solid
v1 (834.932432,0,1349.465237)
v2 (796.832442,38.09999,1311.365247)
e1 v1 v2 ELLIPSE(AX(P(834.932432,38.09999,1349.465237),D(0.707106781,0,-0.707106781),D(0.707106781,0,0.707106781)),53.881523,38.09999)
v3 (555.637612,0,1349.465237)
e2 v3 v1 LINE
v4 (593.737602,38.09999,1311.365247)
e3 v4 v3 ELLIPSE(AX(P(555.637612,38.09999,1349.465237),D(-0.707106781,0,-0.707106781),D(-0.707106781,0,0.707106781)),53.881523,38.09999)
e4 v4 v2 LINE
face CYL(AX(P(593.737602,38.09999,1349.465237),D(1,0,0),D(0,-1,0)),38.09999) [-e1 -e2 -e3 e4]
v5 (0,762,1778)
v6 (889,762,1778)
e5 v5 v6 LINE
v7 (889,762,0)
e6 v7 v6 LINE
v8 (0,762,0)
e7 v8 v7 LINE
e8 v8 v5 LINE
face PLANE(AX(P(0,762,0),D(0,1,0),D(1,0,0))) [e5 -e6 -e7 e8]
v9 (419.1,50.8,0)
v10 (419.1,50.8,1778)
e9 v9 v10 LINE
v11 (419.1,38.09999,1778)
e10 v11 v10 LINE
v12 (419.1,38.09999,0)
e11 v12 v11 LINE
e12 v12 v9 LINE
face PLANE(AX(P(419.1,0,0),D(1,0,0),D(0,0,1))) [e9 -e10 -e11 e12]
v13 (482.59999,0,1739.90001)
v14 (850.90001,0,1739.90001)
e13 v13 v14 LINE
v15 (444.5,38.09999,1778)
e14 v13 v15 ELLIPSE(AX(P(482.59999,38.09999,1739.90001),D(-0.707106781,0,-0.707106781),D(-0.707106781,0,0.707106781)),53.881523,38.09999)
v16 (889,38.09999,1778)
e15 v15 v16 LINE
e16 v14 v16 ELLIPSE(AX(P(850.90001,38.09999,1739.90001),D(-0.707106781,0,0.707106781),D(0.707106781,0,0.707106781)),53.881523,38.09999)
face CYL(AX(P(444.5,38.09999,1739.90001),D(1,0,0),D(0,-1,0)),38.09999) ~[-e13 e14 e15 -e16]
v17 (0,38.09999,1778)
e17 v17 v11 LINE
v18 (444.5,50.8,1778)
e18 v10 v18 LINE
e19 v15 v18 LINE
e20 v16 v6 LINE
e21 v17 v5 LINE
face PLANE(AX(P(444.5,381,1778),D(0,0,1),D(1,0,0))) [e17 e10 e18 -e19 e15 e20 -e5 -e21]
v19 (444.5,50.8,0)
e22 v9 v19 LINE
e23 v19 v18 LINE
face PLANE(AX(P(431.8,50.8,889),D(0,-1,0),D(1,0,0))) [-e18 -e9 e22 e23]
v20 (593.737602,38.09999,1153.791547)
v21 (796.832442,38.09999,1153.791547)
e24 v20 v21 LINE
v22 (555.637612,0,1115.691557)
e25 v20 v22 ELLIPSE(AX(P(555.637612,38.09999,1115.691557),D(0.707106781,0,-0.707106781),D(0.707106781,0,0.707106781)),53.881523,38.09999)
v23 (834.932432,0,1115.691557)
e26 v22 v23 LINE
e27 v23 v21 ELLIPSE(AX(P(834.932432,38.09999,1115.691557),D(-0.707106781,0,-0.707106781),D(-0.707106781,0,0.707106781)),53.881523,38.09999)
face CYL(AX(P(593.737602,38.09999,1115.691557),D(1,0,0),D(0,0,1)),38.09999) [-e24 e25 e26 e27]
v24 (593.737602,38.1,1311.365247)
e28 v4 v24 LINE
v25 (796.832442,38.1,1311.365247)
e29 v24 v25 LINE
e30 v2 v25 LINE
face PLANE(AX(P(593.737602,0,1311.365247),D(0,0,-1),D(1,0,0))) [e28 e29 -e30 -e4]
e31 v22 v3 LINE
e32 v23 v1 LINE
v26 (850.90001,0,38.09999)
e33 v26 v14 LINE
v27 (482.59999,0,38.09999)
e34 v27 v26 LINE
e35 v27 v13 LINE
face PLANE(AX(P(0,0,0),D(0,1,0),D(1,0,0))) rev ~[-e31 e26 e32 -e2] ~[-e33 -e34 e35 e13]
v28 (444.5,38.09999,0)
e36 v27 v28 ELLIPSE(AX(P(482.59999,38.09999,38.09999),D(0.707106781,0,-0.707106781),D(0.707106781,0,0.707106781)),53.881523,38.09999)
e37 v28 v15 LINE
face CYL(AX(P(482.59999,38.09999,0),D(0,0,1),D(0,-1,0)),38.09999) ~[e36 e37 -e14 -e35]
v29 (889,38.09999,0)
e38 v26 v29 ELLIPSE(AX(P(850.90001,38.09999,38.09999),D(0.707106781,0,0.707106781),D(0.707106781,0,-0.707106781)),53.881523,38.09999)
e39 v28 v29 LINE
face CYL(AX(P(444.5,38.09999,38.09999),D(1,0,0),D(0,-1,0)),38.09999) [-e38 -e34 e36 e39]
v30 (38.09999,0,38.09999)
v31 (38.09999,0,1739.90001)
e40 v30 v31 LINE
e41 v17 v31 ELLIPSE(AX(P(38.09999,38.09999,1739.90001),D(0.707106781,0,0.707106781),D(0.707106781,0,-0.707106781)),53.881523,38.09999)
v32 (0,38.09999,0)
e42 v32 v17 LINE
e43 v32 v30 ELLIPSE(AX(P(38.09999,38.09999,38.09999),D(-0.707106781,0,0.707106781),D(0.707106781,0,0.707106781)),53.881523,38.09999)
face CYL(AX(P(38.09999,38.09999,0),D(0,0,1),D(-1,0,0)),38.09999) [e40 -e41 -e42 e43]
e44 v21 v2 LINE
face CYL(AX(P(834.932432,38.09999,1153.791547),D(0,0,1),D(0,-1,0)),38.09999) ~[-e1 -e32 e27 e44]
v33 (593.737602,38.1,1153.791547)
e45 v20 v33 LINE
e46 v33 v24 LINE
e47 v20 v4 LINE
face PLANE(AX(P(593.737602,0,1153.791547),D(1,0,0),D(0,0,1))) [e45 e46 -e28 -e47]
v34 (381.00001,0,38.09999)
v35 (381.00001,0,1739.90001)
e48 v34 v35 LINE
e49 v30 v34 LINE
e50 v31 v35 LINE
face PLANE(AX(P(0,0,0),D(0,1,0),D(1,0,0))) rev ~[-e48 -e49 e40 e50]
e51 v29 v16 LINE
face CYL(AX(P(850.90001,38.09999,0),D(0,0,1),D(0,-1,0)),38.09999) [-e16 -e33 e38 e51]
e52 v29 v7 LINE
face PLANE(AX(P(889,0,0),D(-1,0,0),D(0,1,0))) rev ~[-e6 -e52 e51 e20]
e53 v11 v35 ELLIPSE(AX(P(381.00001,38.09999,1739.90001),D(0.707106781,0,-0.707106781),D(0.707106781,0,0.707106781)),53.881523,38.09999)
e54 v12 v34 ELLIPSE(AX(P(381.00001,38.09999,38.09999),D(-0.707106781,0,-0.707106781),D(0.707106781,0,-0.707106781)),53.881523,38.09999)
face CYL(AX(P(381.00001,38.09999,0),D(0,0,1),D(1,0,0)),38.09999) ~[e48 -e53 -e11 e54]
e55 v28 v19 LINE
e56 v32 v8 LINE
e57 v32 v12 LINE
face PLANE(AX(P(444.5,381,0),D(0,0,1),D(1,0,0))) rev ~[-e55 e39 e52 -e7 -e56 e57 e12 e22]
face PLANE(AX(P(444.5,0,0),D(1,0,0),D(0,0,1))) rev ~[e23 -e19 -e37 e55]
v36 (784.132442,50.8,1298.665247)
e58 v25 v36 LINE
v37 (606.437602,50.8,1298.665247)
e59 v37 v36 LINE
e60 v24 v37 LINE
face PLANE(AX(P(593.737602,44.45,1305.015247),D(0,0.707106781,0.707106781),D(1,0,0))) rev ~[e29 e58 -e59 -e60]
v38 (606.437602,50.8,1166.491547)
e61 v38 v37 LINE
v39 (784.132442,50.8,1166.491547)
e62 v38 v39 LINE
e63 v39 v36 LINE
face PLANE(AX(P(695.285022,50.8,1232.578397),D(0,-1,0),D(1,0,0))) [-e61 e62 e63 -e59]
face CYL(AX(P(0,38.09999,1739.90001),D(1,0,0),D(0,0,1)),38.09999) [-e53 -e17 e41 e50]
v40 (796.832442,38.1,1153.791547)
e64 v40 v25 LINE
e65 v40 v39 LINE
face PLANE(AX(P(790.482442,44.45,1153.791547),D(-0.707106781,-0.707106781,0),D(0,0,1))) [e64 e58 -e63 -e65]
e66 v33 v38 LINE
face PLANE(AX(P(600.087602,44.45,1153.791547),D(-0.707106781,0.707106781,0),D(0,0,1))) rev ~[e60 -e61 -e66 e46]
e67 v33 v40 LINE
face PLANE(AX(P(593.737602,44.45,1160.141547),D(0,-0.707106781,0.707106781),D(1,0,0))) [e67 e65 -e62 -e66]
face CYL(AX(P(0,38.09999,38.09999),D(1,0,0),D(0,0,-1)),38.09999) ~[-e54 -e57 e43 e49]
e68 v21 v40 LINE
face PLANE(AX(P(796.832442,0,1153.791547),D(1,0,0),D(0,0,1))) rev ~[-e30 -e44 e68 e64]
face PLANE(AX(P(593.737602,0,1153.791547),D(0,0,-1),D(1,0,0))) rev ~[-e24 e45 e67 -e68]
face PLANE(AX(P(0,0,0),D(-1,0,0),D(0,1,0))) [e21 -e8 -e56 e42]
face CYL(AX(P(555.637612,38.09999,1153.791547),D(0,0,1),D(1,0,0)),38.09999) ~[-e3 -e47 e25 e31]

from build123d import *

# Parameters (mm, degrees)
F0_W     = 889
F0_H     = 762
F1_DEPTH = 1778
F2_W     = 25.4
F2_H     = 1778
F3_DEPTH = 50.8
F4_W     = 203.0948400497
F4_H     = 157.5736999512
F5_DEPTH = 50.8
F6_SIZE  = 12.7
F7_R     = 38.09999


# Not quite as in the source:
# - a fillet or chamfer is up to 0.001 mm smaller than in the source, because OpenCascade refuses the exact size


with BuildPart() as f1:
    # F0 (on Top) → F1 (new body)
    with BuildSketch(Plane.XY):
        with Locations((444.5, 381)):
            Rectangle(F0_W, F0_H)
    extrude(amount=F1_DEPTH)

    # F2 (on face) → F3 (cut)
    with BuildSketch(Plane.XZ):
        with Locations((431.8, 889)):
            Rectangle(F2_W, F2_H)
    extrude(amount=-F3_DEPTH, mode=Mode.SUBTRACT)

    # F4 (on face) → F5 (cut)
    with BuildSketch(Plane.XZ):
        with Locations((695.2850222588, 1232.5783967972)):
            Rectangle(F4_W, F4_H)
    extrude(amount=-F5_DEPTH, mode=Mode.SUBTRACT)

    # F6
    f6_edges = [f1.edges().sort_by_distance(p)[0] for p in [
        (695.285022, 50.8, 1311.365247),
        (593.737602, 50.8, 1232.578397),
        (695.285022, 50.8, 1153.791547),
        (796.832442, 50.8, 1232.578397),
    ]]
    chamfer(f6_edges, length=F6_SIZE)

    # F7 (radius 38.1 in the source; OpenCascade refuses exactly that, so slightly less here)
    f7_edges = [f1.edges().sort_by_distance(p)[0] for p in [
        (209.55, 0, 0),
        (419.1, 0, 889),
        (209.55, 0, 1778),
        (0, 0, 889),
        (666.75, 0, 0),
        (444.5, 0, 889),
        (889, 0, 889),
        (666.75, 0, 1778),
        (796.832442, 0, 1232.578397),
        (695.285022, 0, 1153.791547),
        (593.737602, 0, 1232.578397),
        (695.285022, 0, 1311.365247),
    ]]
    fillet(f7_edges, radius=F7_R)


solid = f1.part
